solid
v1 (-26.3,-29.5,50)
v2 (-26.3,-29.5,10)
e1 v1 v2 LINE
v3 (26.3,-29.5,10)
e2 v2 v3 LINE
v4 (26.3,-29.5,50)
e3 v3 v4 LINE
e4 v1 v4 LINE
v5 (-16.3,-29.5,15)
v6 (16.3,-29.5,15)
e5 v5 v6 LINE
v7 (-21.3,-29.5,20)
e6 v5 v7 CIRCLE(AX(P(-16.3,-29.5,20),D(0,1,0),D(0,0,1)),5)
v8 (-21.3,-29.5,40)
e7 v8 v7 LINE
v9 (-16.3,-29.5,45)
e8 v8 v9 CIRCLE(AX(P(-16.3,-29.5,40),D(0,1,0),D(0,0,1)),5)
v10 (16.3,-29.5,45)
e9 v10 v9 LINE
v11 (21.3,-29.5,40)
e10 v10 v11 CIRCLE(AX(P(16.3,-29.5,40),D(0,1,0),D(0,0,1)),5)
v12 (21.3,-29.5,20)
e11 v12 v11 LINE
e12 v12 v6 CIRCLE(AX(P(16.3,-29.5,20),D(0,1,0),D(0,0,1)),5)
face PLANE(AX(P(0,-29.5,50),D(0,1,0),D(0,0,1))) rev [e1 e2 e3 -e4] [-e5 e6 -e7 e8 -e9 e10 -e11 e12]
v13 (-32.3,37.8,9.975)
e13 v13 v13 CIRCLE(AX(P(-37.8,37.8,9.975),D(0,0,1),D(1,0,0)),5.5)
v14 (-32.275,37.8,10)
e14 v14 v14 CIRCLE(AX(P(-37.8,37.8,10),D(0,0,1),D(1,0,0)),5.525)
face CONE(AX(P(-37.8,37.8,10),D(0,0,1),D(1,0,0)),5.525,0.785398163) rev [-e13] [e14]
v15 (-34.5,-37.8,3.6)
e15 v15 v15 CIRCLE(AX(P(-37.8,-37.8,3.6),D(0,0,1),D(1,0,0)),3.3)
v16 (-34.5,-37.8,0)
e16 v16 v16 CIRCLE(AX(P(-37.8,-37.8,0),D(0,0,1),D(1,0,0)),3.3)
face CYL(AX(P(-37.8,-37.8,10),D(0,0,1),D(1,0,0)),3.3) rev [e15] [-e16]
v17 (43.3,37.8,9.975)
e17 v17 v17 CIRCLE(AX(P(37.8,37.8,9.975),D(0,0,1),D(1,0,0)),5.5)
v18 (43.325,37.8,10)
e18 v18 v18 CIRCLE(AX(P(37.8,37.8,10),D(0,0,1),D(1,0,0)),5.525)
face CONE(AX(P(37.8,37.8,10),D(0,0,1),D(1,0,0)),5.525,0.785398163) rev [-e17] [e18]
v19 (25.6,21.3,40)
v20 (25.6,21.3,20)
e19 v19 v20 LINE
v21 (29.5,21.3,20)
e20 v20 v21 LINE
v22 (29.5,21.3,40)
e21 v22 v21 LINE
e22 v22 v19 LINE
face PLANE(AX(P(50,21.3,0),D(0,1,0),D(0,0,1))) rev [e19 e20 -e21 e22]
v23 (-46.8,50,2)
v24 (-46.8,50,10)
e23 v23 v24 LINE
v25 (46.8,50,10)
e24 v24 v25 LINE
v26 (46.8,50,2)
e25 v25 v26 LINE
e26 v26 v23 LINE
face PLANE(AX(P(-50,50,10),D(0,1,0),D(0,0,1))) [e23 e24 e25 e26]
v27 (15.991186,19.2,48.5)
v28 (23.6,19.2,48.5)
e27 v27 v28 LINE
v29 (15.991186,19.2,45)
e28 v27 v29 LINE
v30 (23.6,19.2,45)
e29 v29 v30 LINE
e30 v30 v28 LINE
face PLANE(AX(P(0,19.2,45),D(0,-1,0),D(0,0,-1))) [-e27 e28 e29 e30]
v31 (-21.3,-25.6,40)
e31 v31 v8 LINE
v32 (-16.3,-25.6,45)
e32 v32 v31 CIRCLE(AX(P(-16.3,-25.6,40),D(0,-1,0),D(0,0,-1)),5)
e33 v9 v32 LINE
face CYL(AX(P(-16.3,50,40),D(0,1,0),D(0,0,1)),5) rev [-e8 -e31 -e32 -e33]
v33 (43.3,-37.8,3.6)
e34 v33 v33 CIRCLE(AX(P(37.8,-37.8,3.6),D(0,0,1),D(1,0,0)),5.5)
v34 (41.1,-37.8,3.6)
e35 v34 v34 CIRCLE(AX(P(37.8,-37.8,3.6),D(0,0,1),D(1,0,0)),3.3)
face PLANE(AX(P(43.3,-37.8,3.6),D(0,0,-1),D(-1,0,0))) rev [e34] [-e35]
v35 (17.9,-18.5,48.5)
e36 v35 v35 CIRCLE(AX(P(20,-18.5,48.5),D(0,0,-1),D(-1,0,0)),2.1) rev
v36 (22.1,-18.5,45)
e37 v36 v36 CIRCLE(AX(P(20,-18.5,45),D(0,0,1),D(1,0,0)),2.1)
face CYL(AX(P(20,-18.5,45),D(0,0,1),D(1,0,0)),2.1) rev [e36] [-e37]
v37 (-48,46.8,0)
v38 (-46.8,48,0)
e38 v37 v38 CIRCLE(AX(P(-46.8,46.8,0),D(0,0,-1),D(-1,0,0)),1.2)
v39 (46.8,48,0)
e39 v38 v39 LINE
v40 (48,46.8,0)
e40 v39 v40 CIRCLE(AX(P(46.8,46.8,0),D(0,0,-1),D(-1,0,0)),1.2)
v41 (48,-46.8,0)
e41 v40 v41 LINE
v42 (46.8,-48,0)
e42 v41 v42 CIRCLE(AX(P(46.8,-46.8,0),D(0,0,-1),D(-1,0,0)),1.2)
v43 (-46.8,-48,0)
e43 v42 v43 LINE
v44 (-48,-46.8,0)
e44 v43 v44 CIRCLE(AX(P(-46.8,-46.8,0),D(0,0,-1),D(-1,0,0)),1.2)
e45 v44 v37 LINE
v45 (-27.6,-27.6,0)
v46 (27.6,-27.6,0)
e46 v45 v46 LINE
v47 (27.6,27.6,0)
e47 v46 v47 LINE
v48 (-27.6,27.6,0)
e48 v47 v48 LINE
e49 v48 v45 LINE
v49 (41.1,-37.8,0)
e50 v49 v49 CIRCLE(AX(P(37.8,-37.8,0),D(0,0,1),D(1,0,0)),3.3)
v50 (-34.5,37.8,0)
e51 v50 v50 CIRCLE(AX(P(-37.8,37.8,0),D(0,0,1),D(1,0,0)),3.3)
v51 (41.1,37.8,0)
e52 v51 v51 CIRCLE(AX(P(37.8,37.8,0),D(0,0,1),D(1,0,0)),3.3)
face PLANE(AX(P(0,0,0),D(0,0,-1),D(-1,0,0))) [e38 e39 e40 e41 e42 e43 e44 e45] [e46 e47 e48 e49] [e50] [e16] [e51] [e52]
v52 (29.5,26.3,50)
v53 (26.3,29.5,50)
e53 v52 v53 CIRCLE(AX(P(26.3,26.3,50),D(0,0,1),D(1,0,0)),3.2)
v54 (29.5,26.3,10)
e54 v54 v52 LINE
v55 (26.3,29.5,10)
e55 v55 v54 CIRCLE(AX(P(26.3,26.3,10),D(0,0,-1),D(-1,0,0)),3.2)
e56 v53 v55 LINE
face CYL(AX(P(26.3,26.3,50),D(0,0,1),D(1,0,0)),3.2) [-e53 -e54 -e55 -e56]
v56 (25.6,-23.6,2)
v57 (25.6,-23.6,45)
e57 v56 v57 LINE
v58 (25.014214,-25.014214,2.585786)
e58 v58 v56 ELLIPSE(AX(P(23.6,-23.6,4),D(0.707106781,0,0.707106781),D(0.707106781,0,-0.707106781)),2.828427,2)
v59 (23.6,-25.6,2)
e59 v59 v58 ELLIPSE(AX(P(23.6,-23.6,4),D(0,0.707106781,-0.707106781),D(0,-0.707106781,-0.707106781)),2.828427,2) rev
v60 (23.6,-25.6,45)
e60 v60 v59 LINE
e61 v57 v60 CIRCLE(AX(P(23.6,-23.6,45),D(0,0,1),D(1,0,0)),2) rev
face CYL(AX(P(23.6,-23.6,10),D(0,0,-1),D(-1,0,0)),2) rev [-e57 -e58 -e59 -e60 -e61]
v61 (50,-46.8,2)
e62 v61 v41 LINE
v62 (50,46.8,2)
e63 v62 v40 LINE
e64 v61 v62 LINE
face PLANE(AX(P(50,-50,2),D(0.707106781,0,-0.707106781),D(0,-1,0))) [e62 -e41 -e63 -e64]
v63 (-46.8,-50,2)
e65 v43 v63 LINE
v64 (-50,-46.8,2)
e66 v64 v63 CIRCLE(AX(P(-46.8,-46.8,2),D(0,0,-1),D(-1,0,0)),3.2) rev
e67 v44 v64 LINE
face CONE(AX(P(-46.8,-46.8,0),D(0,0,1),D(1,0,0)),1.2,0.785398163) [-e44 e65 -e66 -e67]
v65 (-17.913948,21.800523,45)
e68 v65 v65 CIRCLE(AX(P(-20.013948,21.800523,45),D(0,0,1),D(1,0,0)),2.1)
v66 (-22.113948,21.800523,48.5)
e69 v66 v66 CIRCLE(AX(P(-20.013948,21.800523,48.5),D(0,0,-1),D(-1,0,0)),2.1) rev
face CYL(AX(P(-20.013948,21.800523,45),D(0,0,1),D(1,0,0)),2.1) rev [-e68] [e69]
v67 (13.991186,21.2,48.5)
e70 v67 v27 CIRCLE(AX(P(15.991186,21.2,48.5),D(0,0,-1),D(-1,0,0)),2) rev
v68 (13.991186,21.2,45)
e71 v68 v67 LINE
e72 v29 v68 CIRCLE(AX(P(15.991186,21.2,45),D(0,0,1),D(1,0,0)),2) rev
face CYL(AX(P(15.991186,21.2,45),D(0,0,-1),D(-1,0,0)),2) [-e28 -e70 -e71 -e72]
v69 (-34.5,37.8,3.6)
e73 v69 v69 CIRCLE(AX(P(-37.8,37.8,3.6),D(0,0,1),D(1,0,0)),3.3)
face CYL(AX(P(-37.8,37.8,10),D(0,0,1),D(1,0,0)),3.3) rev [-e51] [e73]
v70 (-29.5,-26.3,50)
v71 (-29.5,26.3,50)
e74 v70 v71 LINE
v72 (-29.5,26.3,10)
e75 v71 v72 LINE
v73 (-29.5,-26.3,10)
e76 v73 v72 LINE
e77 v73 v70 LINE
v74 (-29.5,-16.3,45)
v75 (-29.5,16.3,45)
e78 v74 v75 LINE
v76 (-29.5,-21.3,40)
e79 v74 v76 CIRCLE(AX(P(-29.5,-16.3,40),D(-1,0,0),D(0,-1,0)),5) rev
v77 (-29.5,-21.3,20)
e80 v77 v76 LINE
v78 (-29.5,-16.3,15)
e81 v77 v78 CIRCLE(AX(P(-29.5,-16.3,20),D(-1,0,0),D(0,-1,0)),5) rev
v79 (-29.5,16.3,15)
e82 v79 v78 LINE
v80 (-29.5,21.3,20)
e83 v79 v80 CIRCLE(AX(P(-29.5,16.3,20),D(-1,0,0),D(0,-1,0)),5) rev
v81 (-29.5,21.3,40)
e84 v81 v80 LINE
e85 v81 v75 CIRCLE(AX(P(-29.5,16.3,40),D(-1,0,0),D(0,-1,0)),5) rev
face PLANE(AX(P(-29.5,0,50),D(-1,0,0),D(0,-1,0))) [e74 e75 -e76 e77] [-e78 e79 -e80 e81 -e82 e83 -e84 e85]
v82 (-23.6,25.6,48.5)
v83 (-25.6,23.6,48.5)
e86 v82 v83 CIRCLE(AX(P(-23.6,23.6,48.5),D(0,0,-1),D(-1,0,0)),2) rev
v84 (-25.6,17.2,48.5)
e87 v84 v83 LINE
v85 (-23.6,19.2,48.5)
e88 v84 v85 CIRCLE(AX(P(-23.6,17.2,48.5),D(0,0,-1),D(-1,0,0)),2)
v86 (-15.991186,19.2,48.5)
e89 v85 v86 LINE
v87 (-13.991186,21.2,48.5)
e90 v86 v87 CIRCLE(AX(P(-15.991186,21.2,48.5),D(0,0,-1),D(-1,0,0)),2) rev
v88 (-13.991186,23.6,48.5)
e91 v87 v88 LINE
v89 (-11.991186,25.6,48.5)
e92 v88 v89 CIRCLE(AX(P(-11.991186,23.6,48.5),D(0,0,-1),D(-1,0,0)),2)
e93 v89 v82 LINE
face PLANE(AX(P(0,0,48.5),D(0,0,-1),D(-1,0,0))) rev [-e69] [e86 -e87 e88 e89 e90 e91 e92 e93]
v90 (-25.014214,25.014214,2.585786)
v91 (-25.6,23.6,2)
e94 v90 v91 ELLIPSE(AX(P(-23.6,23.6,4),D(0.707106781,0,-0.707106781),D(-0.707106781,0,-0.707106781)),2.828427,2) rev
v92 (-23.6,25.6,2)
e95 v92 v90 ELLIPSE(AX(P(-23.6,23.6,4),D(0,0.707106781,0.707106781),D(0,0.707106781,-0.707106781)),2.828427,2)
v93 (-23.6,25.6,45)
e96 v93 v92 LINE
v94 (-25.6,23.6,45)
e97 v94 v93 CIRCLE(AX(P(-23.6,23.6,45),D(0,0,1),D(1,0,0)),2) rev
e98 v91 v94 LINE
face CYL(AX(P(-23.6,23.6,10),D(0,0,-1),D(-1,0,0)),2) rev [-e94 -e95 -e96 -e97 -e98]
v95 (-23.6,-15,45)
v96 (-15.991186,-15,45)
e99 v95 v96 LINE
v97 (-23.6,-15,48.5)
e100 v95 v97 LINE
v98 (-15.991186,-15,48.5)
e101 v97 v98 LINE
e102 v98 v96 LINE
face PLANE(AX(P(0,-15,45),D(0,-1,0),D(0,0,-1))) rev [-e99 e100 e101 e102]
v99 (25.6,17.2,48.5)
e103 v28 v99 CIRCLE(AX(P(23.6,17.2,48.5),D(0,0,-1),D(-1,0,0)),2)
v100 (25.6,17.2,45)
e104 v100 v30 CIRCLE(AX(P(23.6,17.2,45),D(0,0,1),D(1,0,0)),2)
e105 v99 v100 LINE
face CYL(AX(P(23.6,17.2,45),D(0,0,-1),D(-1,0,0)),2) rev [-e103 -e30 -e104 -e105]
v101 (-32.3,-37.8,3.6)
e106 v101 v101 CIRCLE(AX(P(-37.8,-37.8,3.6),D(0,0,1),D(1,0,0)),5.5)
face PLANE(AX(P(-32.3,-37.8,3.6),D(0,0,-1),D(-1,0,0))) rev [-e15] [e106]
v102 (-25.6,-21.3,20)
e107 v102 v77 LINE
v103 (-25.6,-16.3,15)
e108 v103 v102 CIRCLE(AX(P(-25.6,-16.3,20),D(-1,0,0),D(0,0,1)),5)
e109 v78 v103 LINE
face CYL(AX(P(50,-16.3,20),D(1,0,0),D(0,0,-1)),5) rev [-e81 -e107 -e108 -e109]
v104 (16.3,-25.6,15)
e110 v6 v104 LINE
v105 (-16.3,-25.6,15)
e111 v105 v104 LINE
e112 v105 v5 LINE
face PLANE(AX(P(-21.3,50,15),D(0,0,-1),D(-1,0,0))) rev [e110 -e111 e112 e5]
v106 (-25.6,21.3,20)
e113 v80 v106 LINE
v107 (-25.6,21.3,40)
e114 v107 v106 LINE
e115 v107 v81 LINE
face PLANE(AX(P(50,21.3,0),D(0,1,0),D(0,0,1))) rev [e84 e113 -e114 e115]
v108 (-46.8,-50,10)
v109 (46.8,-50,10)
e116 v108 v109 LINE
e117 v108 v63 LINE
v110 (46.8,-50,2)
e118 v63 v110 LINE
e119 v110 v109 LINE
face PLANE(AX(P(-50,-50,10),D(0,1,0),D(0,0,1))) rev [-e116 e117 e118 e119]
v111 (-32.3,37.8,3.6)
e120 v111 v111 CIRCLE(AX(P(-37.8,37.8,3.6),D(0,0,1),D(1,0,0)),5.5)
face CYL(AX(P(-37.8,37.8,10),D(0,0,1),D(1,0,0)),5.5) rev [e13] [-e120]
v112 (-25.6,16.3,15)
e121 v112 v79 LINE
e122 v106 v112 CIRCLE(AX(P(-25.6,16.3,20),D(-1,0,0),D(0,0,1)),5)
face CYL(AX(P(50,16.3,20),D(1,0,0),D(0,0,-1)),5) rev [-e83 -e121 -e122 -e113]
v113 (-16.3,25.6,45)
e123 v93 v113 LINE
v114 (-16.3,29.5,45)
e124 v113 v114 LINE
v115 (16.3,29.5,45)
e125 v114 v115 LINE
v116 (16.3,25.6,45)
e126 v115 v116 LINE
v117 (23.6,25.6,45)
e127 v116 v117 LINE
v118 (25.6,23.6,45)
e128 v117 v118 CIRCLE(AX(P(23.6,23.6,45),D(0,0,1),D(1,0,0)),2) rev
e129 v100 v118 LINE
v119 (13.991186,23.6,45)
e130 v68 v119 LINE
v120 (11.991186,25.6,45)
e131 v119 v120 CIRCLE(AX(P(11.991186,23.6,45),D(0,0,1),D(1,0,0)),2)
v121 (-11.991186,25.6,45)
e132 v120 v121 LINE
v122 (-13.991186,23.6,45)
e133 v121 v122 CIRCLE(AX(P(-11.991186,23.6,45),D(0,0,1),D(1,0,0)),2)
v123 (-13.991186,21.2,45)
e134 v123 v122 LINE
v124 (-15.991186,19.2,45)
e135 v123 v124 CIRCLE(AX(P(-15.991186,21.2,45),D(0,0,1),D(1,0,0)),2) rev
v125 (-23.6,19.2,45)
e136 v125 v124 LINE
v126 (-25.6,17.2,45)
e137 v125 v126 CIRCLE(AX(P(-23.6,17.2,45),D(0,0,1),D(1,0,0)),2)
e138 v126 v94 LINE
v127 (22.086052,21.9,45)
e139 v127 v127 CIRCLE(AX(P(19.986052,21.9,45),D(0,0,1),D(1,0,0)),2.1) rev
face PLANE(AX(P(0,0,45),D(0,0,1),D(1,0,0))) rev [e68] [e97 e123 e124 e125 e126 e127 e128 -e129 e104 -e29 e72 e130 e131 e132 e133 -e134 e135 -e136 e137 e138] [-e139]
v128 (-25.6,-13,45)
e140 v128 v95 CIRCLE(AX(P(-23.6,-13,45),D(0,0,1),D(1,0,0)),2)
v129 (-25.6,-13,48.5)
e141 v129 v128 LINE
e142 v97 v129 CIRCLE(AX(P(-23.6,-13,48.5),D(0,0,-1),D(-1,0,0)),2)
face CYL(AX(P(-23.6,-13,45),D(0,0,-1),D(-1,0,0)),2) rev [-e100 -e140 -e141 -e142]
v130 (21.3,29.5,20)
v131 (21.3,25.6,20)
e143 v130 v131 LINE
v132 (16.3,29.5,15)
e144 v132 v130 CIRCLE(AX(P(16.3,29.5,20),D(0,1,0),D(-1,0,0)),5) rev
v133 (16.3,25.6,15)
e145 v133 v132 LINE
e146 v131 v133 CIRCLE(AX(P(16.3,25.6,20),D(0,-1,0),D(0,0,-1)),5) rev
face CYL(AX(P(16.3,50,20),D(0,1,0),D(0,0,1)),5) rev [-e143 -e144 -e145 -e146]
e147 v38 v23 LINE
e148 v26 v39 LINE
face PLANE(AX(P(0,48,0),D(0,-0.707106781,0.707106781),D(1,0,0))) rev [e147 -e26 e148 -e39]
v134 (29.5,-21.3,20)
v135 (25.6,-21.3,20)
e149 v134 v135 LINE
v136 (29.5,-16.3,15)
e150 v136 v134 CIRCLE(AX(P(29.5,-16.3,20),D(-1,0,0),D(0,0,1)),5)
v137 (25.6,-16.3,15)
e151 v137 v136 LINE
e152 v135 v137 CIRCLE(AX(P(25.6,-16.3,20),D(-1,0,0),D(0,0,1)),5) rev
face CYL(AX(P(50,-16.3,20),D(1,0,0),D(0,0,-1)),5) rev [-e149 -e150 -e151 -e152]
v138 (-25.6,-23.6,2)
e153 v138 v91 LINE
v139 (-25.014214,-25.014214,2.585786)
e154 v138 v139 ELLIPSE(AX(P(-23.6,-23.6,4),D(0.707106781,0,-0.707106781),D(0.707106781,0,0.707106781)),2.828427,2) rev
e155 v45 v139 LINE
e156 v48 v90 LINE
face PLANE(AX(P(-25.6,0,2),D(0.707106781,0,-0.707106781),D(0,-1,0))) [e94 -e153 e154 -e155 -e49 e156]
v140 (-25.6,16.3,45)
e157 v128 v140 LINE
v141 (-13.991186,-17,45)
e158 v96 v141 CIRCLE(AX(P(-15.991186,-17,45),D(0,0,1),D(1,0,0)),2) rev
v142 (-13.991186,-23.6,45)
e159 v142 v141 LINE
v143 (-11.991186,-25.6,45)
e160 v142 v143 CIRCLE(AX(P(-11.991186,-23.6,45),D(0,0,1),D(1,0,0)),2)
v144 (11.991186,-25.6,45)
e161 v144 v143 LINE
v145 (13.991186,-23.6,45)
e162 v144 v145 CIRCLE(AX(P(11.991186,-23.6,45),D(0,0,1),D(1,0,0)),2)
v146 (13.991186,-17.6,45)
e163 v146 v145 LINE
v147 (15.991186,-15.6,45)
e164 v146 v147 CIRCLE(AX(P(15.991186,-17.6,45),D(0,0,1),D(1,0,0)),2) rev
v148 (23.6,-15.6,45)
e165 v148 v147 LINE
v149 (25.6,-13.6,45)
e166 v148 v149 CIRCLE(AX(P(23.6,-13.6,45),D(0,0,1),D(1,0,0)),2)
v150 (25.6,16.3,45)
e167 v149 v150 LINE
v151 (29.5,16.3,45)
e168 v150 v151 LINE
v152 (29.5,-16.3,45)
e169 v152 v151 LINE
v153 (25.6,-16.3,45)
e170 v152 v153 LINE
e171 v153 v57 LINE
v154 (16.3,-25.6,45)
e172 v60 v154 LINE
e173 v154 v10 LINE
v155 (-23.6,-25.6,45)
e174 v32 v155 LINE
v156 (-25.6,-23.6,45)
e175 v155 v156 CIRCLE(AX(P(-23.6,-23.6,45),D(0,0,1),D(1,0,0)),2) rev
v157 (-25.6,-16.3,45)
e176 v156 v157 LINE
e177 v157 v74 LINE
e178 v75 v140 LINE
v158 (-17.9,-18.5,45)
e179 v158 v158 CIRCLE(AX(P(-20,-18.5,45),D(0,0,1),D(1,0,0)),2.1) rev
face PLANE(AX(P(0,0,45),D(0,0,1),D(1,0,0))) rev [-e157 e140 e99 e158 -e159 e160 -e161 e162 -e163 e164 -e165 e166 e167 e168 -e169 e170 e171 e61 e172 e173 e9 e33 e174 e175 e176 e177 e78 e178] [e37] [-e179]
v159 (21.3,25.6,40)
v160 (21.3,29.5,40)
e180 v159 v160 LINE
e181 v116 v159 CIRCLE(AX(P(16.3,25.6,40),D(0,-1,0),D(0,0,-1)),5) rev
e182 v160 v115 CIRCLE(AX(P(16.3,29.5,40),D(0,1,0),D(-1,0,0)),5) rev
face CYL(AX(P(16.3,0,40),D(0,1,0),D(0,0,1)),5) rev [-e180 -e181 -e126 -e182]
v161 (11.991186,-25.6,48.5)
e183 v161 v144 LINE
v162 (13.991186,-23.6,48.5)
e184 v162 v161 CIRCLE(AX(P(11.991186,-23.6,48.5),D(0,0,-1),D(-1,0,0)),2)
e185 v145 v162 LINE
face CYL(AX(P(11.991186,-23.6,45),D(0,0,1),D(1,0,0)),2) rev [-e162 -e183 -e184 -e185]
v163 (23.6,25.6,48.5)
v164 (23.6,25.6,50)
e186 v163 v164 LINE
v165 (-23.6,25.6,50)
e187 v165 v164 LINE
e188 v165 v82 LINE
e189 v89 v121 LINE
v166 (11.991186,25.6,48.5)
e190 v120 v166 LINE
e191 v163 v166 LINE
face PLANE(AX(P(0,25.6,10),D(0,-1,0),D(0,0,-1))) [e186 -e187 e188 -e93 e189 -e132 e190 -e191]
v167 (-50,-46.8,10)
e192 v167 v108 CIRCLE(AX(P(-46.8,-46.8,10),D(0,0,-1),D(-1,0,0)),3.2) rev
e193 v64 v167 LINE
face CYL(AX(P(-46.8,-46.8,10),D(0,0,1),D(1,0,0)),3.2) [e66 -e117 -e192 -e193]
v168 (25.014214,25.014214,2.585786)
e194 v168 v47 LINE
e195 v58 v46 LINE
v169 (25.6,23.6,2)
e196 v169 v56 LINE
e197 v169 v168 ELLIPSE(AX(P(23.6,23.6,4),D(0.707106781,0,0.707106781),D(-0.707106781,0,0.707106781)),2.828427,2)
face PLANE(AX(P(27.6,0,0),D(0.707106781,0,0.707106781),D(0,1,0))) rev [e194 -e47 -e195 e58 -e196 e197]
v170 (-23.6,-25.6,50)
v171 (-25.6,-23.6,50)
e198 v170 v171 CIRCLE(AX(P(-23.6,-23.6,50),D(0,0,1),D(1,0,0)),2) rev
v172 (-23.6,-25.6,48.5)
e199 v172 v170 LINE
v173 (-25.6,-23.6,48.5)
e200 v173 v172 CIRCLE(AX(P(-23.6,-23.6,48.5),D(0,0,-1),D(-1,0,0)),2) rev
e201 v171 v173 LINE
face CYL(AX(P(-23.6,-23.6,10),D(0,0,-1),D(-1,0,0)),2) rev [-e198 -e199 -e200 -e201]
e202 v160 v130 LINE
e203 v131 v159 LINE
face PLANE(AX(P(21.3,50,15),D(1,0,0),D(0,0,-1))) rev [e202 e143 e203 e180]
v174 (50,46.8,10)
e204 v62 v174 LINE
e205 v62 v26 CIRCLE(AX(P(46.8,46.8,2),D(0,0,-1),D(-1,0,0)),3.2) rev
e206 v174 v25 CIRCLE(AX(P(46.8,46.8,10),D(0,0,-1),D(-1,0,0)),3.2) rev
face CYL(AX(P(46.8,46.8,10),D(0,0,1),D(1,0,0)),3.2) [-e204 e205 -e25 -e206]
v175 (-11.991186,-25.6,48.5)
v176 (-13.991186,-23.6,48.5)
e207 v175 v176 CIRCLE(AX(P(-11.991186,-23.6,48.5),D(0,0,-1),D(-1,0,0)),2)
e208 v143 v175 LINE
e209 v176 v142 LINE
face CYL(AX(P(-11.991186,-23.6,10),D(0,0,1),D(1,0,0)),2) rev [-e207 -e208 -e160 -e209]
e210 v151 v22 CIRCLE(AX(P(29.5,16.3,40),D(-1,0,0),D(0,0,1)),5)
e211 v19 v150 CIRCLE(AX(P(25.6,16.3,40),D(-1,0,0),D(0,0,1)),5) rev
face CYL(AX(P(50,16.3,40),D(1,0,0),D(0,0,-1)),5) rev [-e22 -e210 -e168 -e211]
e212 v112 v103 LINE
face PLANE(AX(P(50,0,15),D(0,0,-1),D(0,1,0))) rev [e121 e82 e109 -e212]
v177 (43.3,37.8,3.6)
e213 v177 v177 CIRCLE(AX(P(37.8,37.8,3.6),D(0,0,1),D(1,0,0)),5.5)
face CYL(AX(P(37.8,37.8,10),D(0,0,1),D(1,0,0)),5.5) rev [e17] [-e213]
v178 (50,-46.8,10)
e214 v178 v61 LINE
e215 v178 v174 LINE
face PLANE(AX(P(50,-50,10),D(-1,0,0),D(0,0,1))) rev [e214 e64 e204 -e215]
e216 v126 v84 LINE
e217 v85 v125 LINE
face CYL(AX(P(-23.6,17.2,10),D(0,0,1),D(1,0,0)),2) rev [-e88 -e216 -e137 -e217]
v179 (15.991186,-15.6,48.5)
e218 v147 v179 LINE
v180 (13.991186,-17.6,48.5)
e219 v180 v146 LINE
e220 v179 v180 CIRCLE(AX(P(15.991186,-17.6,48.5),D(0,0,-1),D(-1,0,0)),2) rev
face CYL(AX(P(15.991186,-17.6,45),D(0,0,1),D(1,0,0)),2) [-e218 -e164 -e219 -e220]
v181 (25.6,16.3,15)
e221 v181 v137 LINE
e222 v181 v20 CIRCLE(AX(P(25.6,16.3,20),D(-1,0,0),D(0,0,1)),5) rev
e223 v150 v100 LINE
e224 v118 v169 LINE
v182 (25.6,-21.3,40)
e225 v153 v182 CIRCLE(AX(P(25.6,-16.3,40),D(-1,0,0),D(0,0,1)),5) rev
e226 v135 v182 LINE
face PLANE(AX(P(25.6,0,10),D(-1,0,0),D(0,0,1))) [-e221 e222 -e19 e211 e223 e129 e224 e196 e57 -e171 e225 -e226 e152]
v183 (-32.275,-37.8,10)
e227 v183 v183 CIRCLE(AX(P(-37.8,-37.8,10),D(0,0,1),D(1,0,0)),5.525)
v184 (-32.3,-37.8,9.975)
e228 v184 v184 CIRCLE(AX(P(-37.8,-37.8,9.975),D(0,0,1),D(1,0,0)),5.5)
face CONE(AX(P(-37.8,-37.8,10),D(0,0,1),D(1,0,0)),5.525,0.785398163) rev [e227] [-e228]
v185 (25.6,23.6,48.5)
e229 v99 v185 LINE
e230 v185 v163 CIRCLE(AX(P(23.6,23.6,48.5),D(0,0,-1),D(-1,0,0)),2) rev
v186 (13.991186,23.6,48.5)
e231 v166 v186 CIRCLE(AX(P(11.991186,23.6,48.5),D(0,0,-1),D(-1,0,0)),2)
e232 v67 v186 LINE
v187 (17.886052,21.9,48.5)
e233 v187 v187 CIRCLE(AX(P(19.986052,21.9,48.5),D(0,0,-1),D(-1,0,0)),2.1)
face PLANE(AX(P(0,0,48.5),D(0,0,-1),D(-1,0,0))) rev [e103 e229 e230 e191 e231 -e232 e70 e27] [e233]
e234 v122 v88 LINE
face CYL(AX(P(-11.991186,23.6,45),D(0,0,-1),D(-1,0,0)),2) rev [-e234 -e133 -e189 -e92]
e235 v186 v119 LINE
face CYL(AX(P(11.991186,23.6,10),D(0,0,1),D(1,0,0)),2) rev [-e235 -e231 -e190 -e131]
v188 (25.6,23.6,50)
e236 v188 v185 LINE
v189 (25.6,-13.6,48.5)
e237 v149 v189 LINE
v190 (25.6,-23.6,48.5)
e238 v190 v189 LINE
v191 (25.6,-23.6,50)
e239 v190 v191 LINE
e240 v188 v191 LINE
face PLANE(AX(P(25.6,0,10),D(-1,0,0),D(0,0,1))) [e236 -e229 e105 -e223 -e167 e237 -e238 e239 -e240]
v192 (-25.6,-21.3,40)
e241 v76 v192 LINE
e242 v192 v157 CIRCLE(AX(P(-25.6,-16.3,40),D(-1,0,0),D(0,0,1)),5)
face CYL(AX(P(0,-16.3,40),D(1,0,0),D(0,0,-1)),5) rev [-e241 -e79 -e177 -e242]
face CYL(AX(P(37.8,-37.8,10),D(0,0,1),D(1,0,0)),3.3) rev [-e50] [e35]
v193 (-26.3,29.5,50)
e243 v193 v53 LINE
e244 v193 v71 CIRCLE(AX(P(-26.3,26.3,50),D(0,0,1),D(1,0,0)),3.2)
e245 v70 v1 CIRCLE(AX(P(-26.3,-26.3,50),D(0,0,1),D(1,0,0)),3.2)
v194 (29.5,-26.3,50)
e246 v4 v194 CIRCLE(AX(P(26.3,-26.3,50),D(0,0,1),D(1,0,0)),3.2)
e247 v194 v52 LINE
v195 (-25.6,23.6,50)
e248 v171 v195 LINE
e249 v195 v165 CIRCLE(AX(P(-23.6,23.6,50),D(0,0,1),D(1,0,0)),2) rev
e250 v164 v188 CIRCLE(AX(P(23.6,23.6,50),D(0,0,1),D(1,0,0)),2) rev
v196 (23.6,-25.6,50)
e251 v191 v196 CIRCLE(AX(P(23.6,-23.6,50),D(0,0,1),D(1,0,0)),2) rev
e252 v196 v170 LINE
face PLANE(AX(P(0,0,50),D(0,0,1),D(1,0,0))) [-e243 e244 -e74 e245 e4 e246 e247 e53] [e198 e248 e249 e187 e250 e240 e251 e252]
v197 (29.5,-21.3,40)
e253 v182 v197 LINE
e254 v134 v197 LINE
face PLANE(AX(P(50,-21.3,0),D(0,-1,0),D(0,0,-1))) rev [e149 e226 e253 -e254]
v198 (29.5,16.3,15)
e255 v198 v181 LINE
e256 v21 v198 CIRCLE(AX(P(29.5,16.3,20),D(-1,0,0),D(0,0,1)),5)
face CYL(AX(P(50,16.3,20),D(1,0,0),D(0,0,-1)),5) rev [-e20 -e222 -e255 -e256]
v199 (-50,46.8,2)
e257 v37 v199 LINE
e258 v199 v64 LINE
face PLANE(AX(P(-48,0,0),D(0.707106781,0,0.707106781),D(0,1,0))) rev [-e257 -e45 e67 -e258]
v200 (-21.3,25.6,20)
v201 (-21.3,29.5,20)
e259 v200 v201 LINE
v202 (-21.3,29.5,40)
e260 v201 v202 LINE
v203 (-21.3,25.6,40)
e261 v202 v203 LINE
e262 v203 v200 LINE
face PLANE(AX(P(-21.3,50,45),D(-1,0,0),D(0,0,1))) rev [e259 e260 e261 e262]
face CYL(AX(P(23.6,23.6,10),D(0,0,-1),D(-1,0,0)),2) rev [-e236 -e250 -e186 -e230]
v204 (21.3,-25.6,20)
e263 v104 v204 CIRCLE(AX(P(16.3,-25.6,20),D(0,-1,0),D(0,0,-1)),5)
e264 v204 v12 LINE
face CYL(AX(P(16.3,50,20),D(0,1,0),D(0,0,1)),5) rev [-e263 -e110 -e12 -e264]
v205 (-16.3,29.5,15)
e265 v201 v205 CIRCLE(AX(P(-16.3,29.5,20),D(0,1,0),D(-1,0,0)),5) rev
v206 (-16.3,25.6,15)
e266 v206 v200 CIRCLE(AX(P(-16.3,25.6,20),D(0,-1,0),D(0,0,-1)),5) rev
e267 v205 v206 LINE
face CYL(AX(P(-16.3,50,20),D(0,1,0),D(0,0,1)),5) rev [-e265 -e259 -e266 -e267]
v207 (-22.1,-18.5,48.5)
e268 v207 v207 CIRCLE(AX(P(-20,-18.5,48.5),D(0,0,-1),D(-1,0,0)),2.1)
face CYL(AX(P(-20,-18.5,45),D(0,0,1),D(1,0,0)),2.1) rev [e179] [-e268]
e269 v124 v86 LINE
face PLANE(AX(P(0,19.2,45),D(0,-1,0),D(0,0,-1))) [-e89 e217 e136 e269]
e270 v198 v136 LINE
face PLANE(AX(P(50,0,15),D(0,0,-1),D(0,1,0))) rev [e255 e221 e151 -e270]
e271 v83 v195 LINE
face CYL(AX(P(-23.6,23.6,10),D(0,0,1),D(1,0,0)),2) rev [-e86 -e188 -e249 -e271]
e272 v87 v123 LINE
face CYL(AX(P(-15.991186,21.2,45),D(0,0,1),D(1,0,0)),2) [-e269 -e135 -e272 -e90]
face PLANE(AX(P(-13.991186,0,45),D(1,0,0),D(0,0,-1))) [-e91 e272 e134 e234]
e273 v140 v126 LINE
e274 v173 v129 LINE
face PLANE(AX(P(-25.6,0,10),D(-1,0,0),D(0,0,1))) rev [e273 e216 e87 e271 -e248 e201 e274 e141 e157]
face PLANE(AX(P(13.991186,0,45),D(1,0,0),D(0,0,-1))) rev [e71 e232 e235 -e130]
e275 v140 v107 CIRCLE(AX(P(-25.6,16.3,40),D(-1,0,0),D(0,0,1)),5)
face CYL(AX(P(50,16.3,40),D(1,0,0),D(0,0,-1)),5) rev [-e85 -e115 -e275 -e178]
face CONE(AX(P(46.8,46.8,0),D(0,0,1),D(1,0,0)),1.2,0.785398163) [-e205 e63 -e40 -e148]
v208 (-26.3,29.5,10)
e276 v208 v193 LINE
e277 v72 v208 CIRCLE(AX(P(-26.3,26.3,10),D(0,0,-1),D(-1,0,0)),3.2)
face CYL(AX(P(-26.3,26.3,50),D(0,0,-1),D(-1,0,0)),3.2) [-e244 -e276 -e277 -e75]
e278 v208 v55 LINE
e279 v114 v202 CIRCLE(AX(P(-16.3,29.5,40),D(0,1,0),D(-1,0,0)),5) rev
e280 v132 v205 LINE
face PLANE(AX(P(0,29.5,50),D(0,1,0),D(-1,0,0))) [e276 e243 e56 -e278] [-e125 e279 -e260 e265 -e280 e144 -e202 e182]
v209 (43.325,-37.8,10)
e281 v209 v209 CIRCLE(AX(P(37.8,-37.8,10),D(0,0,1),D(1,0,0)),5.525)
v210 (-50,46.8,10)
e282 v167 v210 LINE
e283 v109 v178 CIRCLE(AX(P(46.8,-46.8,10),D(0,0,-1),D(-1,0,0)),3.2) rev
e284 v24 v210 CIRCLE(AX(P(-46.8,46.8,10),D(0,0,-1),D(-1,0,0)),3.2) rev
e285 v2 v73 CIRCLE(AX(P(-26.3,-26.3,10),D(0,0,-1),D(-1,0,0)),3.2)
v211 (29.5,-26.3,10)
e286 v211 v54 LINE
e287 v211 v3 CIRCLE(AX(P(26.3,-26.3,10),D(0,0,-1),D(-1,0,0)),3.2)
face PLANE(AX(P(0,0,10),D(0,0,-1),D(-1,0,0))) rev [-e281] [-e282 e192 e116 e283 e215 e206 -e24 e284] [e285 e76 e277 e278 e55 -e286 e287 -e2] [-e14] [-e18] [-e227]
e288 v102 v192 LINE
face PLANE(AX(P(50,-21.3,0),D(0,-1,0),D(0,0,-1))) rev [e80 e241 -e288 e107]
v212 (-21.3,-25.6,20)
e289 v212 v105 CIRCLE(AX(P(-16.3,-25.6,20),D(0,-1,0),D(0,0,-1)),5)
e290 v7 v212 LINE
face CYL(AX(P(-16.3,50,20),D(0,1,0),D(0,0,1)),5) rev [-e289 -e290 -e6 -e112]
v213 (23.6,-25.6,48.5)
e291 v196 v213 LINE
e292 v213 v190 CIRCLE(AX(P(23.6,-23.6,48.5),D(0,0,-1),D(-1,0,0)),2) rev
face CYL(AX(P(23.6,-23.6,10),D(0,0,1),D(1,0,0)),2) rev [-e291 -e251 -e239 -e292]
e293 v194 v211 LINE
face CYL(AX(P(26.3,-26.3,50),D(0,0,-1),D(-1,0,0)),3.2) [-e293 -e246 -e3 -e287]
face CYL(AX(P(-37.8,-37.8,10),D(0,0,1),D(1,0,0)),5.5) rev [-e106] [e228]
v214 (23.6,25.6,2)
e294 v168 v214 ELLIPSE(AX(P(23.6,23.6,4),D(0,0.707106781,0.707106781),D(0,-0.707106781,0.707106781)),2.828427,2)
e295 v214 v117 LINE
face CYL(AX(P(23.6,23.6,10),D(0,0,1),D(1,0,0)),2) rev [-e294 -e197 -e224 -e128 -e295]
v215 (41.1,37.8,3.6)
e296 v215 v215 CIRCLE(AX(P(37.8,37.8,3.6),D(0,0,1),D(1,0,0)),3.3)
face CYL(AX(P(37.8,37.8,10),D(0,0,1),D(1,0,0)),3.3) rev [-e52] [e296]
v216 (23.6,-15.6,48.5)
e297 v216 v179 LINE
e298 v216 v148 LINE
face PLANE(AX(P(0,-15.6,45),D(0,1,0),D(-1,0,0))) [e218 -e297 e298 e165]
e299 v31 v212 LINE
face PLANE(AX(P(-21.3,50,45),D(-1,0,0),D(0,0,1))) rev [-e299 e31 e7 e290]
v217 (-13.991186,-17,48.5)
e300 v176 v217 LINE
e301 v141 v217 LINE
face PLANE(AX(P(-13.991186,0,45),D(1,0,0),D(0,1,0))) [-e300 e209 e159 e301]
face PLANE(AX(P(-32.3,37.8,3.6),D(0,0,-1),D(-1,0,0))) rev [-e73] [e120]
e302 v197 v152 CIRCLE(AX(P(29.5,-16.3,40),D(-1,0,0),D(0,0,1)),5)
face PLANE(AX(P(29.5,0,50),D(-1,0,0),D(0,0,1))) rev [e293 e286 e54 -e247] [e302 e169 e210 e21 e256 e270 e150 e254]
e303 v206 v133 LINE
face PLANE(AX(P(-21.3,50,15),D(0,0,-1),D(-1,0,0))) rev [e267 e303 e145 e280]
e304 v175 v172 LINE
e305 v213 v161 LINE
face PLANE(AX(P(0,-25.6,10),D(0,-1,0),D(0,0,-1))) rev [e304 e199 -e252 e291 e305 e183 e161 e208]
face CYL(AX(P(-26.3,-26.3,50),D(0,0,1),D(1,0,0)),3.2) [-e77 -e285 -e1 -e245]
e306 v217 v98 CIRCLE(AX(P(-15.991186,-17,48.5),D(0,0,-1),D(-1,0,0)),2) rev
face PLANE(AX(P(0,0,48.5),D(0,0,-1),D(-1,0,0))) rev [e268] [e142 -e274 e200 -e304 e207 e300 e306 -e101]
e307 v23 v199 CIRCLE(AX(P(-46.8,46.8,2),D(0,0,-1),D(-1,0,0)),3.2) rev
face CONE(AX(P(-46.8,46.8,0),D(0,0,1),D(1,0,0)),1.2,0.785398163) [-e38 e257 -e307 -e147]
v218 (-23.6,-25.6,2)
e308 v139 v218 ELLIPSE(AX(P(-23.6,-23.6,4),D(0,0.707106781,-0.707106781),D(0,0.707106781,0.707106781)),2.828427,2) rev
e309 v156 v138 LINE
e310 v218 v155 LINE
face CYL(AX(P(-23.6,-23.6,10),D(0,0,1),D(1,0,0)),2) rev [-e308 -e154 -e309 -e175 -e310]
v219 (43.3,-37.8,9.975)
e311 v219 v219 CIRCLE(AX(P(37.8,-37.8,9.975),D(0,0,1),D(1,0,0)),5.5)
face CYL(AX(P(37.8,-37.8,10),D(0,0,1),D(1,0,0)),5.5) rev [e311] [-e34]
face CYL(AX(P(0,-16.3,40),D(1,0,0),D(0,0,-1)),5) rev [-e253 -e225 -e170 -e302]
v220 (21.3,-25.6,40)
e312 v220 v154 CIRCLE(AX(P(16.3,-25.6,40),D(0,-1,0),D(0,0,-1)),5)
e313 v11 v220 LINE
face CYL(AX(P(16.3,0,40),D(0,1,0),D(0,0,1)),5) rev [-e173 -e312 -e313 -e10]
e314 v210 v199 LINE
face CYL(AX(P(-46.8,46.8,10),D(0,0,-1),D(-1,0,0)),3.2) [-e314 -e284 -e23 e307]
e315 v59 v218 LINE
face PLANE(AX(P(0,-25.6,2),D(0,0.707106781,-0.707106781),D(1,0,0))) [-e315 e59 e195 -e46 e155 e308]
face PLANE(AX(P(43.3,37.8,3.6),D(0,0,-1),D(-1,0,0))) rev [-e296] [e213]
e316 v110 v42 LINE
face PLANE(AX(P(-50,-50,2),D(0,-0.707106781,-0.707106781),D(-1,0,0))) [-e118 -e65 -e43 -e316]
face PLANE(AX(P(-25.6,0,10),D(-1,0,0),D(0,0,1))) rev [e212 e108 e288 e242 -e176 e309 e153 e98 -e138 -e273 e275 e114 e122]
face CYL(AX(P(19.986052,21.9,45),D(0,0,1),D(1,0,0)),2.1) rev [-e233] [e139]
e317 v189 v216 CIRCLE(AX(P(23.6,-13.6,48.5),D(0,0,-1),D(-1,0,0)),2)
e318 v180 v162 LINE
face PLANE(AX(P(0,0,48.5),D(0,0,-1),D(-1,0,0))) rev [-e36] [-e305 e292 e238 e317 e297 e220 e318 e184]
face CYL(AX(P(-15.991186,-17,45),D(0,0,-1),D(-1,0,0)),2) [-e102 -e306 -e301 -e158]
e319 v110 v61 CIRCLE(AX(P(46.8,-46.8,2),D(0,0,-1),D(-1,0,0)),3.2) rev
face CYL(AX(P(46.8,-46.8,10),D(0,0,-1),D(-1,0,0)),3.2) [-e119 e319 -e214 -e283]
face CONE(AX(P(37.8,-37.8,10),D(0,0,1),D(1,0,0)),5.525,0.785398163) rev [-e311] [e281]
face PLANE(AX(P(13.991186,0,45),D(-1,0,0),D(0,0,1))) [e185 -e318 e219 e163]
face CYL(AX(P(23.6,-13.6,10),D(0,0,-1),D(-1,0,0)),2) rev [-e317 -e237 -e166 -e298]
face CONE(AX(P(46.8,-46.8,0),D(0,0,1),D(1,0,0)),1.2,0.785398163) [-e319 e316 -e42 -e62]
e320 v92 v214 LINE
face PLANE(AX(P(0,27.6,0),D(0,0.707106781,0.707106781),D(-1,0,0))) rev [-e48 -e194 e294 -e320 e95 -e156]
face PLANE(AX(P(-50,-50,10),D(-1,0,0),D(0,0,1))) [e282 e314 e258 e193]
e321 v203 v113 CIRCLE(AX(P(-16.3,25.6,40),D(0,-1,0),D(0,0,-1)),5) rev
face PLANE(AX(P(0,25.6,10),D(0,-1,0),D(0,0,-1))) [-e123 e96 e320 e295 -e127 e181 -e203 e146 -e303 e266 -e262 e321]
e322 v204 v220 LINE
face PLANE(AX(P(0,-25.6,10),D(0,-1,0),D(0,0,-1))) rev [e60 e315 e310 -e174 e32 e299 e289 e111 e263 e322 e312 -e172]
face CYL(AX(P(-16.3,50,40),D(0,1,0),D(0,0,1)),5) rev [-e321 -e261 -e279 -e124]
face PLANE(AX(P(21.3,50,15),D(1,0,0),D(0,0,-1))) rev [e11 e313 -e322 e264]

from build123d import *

# Parameters (mm, degrees)
SKETCH2_W                                    = 100
SKETCH2_H                                    = 100
SKETCH2_W_2                                  = 51.2
SKETCH2_H_2                                  = 51.2
BOSS_EXTRUDE1_DEPTH                          = 10
CBORE_FOR_M6_HEX_SOCKET_HEAD_CAP_SCR_2_COUNT = 2
CBORE_FOR_M6_HEX_SOCKET_HEAD_CAP_SCR_2_PITCH = 75.6
CBORE_FOR_M6_HEX_SOCKET_HEAD_CAP_SCR_3_COUNT = 2
CBORE_FOR_M6_HEX_SOCKET_HEAD_CAP_SCR_3_PITCH = 106.914545315
CBORE_FOR_M6_HEX_SOCKET_HEAD_CAP_SCR_4_COUNT = 2
CBORE_FOR_M6_HEX_SOCKET_HEAD_CAP_SCR_4_PITCH = 75.6
SKETCH7_W                                    = 59
SKETCH7_H                                    = 59
SKETCH7_W_2                                  = 51.2
SKETCH7_H_2                                  = 51.2
BOSS_EXTRUDE2_DEPTH                          = 40
SKETCH8_W                                    = 11.608814293
SKETCH8_H                                    = 6.4
SKETCH8_R                                    = 2.1
BOSS_EXTRUDE3_DEPTH                          = 5
FILLET1_R                                    = 3.2
SKETCH11_W                                   = 42.6
SKETCH11_H                                   = 30
CUT_EXTRUDE2_DEPTH                           = 107.396663482
SKETCH12_W                                   = 42.6
SKETCH12_H                                   = 30
CUT_EXTRUDE3_DEPTH                           = 107.396663482
FILLET3_R                                    = 5
FILLET4_R                                    = 5
CHAMFER2_SIZE                                = 2
CHAMFER3_SIZE                                = 2
SKETCH13_W                                   = 51.2
SKETCH13_H                                   = 51.2
CUT_EXTRUDE4_DEPTH                           = 1.5
FILLET5_R                                    = 2


with BuildPart() as part:
    # Sketch2 → Boss-Extrude1 (new body)
    with BuildSketch(Plane(origin=(0, 0, 0), x_dir=(0, 1, 0), z_dir=(0, 0, 1))):
        Rectangle(SKETCH2_W, SKETCH2_H)
        Rectangle(SKETCH2_W_2, SKETCH2_H_2, mode=Mode.SUBTRACT)
    extrude(amount=BOSS_EXTRUDE1_DEPTH)

    # Sketch6 → CBORE for M6 Hex Socket Head Cap Screw1 (revolve, cut)
    with BuildSketch(Plane(origin=(-37.8, 37.8, 10), x_dir=(0, -1, 0), z_dir=(1, 0, 0))):
        Polygon((0, 0), (0, 10), (3.3, 10), (3.3, 6.4), (5.5, 6.4), (5.5, 0.025), (5.525, 0), align=None)
    cbore_for_m6_hex_socket_head_cap_screw1 = revolve(axis=Axis((-37.8, 37.8, 16.35), (0, 0, -1)), mode=Mode.SUBTRACT)

    # CBORE for M6 Hex Socket Head Cap Scr 2: CBORE for M6 Hex Socket Head Cap Screw1 ×2
    with Locations(*[(i * CBORE_FOR_M6_HEX_SOCKET_HEAD_CAP_SCR_2_PITCH, 0, 0) for i in range(1, CBORE_FOR_M6_HEX_SOCKET_HEAD_CAP_SCR_2_COUNT)]):
        add(cbore_for_m6_hex_socket_head_cap_screw1, mode=Mode.SUBTRACT)

    # CBORE for M6 Hex Socket Head Cap Scr 3: CBORE for M6 Hex Socket Head Cap Screw1 ×2
    with Locations(*[Vector(0.7071067811865475, -0.7071067811865476, 0) * (i * CBORE_FOR_M6_HEX_SOCKET_HEAD_CAP_SCR_3_PITCH) for i in range(1, CBORE_FOR_M6_HEX_SOCKET_HEAD_CAP_SCR_3_COUNT)]):
        add(cbore_for_m6_hex_socket_head_cap_screw1, mode=Mode.SUBTRACT)

    # CBORE for M6 Hex Socket Head Cap Scr 4: CBORE for M6 Hex Socket Head Cap Screw1 ×2
    with Locations(*[(0, -i * CBORE_FOR_M6_HEX_SOCKET_HEAD_CAP_SCR_4_PITCH, 0) for i in range(1, CBORE_FOR_M6_HEX_SOCKET_HEAD_CAP_SCR_4_COUNT)]):
        add(cbore_for_m6_hex_socket_head_cap_screw1, mode=Mode.SUBTRACT)

    # Sketch7 → Boss-Extrude2 (add)
    with BuildSketch(Plane.XY.offset(10)):
        Rectangle(SKETCH7_W, SKETCH7_H)
        Rectangle(SKETCH7_W_2, SKETCH7_H_2, mode=Mode.SUBTRACT)
    extrude(amount=BOSS_EXTRUDE2_DEPTH)

    # Sketch8 → Boss-Extrude3 (add)
    # profile 1 of 4: a face of its own
    with BuildSketch(Plane.XY.offset(50)):
        Polygon((13.991185707, -25.6), (20, -25.6), (25.6, -25.6), (25.6, -17.5), (25.6, -15.6), (13.991185707, -15.6), (13.991185707, -17.5), align=None)
        with BuildLine():
            ThreePointArc((22.1, -18.5), (21.48492424, -19.98492424), (20, -20.6))
            ThreePointArc((20, -20.6), (18.51507576, -17.01507576), (22.1, -18.5))
        make_face(mode=Mode.SUBTRACT)
    # profile 2 of 4: a face of its own
    with BuildSketch(Plane.XY.offset(50)):
        Polygon((-20, -25.6), (-13.991185707, -25.6), (-13.991185707, -17.5), (-13.991185707, -15), (-25.6, -15), (-25.6, -17.5), (-25.6, -25.6), align=None)
        with BuildLine():
            ThreePointArc((-17.9, -18.5), (-18.51507576, -19.98492424), (-20, -20.6))
            ThreePointArc((-20, -20.6), (-21.48492424, -17.01507576), (-17.9, -18.5))
        make_face(mode=Mode.SUBTRACT)
    # profile 3 of 4: a face of its own
    with BuildSketch(Plane.XY.offset(50)):
        Polygon((19.986052448, 25.6), (13.991185707, 25.6), (13.991185707, 19.2), (25.6, 19.2), (25.6, 25.6), align=None)
        with BuildLine():
            ThreePointArc((22.086052448, 21.9), (18.501128208, 20.41507576), (19.986052448, 24))
            ThreePointArc((19.986052448, 24), (21.470976689, 23.38492424), (22.086052448, 21.9))
        make_face(mode=Mode.SUBTRACT)
    # profile 4 of 4: a face of its own
    with BuildSketch(Plane.XY.offset(50)):
        with Locations((-19.795592854, 22.4)):
            Rectangle(SKETCH8_W, SKETCH8_H)
        with Locations((-20.013947552, 21.800522552)):
            Circle(SKETCH8_R, mode=Mode.SUBTRACT)
    extrude(amount=-BOSS_EXTRUDE3_DEPTH)

    # Fillet1
    fillet1_edges = [part.edges().sort_by_distance(p)[0] for p in [
        (-29.5, -29.5, 30),
        (29.5, -29.5, 30),
        (50, -50, 5),
        (29.5, 29.5, 30),
        (-50, -50, 5),
        (-50, 50, 5),
        (-29.5, 29.5, 30),
        (50, 50, 5),
    ]]
    fillet(fillet1_edges, radius=FILLET1_R)

    # Sketch11 → Cut-Extrude2 (cut, through all)
    with BuildSketch(Plane(origin=(-29.5, 0, 0), x_dir=(0, -1, 0), z_dir=(-1, 0, 0))):
        with Locations((0, 30)):
            Rectangle(SKETCH11_W, SKETCH11_H)
    extrude(amount=-CUT_EXTRUDE2_DEPTH, mode=Mode.SUBTRACT)

    # Sketch12 → Cut-Extrude3 (cut, through all)
    with BuildSketch(Plane.XZ.offset(29.5)):
        with Locations((0, 30)):
            Rectangle(SKETCH12_W, SKETCH12_H)
    extrude(amount=-CUT_EXTRUDE3_DEPTH, mode=Mode.SUBTRACT)

    # Fillet3
    # the kernel refuses this fillet: 5 mm, written as the material it adds along each edge
    with BuildSketch(Plane(origin=(-29.5, -21.3, 15), x_dir=(0, 1, 0), z_dir=(1, 0, 0)), Plane(origin=(-29.5, -21.3, 45), x_dir=(0, 0, -1), z_dir=(1, 0, 0)), Plane(origin=(25.6, -21.3, 45), x_dir=(0, 0, -1), z_dir=(1, 0, 0)), Plane(origin=(-21.3, -29.5, 15), x_dir=(0, 0, 1), z_dir=(0, 1, 0)), Plane(origin=(21.3, 25.6, 45), x_dir=(0, 0, -1), z_dir=(0, 1, 0))) as fillet3_piece_1:
        with BuildLine():
            CenterArc((FILLET3_R, FILLET3_R), FILLET3_R, 180, 90)
            Line((0, FILLET3_R), (0, 0))
            Line((0, 0), (FILLET3_R, 0))
        make_face()
    extrude(amount=3.9)
    with BuildSketch(Plane(origin=(25.6, -21.3, 15), x_dir=(0, 0, 1), z_dir=(1, 0, 0)), Plane(origin=(25.6, 21.3, 15), x_dir=(0, -1, 0), z_dir=(1, 0, 0)), Plane(origin=(25.6, 21.3, 45), x_dir=(0, 0, -1), z_dir=(1, 0, 0)), Plane(origin=(-21.3, -29.5, 45), x_dir=(0, 0, -1), z_dir=(0, 1, 0)), Plane(origin=(-21.3, 25.6, 45), x_dir=(0, 0, -1), z_dir=(0, 1, 0)), Plane(origin=(21.3, 25.6, 15), x_dir=(0, 0, 1), z_dir=(0, 1, 0)), Plane(origin=(-21.3, 25.6, 15), x_dir=(1, 0, 0), z_dir=(0, 1, 0))) as fillet3_piece_2:
        with BuildLine():
            CenterArc((FILLET3_R, -FILLET3_R), FILLET3_R, 90, 90)
            Line((0, -FILLET3_R), (0, 0))
            Line((0, 0), (FILLET3_R, 0))
        make_face()
    extrude(amount=3.9)

    # Fillet4
    # the kernel refuses this fillet: 5 mm, written as the material it adds along each edge
    with BuildSketch(Plane(origin=(-29.5, 21.3, 15), x_dir=(0, 0, 1), z_dir=(1, 0, 0)), Plane(origin=(21.3, -29.5, 45), x_dir=(0, 0, -1), z_dir=(0, 1, 0))) as fillet4_piece_1:
        with BuildLine():
            CenterArc((FILLET4_R, FILLET4_R), FILLET4_R, 180, 90)
            Line((0, FILLET4_R), (0, 0))
            Line((0, 0), (FILLET4_R, 0))
        make_face()
    extrude(amount=3.9)
    with BuildSketch(Plane(origin=(-29.5, 21.3, 45), x_dir=(0, 0, -1), z_dir=(1, 0, 0)), Plane(origin=(21.3, -29.5, 15), x_dir=(0, 0, 1), z_dir=(0, 1, 0))) as fillet4_piece_2:
        with BuildLine():
            CenterArc((FILLET4_R, -FILLET4_R), FILLET4_R, 90, 90)
            Line((0, -FILLET4_R), (0, 0))
            Line((0, 0), (FILLET4_R, 0))
        make_face()
    extrude(amount=3.9)

    # Chamfer2
    chamfer2_edges = [part.edges().sort_by_distance(p)[0] for p in [
        (0, -50, 0),
        (50, 0, 0),
        (-50, 0, 0),
        (0, 50, 0),
        (-49.0627417, 49.0627417, 0),
        (49.0627417, 49.0627417, 0),
        (49.0627417, -49.0627417, 0),
        (-49.0627417, -49.0627417, 0),
    ]]
    chamfer(chamfer2_edges, length=CHAMFER2_SIZE)

    # Chamfer3
    chamfer3_edges = [part.edges().sort_by_distance(p)[0] for p in [
        (25.6, 0, 0),
        (0, 25.6, 0),
        (0, -25.6, 0),
        (-25.6, 0, 0),
    ]]
    chamfer(chamfer3_edges, length=CHAMFER3_SIZE)

    # Sketch13 → Cut-Extrude4 (cut)
    with BuildSketch(Plane.XY.offset(50)):
        Rectangle(SKETCH13_W, SKETCH13_H)
    extrude(amount=-CUT_EXTRUDE4_DEPTH, mode=Mode.SUBTRACT)

    # Fillet5
    fillet5_edges = [part.edges().sort_by_distance(p)[0] for p in [
        (-25.6, -25.6, 23.5),
        (25.6, -25.6, 23.5),
        (-25.6, 25.6, 23.5),
        (25.6, 25.6, 23.5),
        (-25.6, -15, 46.75),
        (-13.991185707, -15, 46.75),
        (-13.991185707, -25.6, 46.75),
        (13.991185707, -25.6, 46.75),
        (13.991185707, -15.6, 46.75),
        (25.6, -15.6, 46.75),
        (25.6, 19.2, 46.75),
        (13.991185707, 19.2, 46.75),
        (13.991185707, 25.6, 46.75),
        (-13.991185707, 19.2, 46.75),
        (-25.6, 19.2, 46.75),
        (-13.991185707, 25.6, 46.75),
        (25.6, 25.6, 49.25),
        (-25.6, -25.6, 49.25),
        (25.6, -25.6, 49.25),
        (-25.6, 25.6, 49.25),
    ]]
    fillet(fillet5_edges, radius=FILLET5_R)


solid = part.part
